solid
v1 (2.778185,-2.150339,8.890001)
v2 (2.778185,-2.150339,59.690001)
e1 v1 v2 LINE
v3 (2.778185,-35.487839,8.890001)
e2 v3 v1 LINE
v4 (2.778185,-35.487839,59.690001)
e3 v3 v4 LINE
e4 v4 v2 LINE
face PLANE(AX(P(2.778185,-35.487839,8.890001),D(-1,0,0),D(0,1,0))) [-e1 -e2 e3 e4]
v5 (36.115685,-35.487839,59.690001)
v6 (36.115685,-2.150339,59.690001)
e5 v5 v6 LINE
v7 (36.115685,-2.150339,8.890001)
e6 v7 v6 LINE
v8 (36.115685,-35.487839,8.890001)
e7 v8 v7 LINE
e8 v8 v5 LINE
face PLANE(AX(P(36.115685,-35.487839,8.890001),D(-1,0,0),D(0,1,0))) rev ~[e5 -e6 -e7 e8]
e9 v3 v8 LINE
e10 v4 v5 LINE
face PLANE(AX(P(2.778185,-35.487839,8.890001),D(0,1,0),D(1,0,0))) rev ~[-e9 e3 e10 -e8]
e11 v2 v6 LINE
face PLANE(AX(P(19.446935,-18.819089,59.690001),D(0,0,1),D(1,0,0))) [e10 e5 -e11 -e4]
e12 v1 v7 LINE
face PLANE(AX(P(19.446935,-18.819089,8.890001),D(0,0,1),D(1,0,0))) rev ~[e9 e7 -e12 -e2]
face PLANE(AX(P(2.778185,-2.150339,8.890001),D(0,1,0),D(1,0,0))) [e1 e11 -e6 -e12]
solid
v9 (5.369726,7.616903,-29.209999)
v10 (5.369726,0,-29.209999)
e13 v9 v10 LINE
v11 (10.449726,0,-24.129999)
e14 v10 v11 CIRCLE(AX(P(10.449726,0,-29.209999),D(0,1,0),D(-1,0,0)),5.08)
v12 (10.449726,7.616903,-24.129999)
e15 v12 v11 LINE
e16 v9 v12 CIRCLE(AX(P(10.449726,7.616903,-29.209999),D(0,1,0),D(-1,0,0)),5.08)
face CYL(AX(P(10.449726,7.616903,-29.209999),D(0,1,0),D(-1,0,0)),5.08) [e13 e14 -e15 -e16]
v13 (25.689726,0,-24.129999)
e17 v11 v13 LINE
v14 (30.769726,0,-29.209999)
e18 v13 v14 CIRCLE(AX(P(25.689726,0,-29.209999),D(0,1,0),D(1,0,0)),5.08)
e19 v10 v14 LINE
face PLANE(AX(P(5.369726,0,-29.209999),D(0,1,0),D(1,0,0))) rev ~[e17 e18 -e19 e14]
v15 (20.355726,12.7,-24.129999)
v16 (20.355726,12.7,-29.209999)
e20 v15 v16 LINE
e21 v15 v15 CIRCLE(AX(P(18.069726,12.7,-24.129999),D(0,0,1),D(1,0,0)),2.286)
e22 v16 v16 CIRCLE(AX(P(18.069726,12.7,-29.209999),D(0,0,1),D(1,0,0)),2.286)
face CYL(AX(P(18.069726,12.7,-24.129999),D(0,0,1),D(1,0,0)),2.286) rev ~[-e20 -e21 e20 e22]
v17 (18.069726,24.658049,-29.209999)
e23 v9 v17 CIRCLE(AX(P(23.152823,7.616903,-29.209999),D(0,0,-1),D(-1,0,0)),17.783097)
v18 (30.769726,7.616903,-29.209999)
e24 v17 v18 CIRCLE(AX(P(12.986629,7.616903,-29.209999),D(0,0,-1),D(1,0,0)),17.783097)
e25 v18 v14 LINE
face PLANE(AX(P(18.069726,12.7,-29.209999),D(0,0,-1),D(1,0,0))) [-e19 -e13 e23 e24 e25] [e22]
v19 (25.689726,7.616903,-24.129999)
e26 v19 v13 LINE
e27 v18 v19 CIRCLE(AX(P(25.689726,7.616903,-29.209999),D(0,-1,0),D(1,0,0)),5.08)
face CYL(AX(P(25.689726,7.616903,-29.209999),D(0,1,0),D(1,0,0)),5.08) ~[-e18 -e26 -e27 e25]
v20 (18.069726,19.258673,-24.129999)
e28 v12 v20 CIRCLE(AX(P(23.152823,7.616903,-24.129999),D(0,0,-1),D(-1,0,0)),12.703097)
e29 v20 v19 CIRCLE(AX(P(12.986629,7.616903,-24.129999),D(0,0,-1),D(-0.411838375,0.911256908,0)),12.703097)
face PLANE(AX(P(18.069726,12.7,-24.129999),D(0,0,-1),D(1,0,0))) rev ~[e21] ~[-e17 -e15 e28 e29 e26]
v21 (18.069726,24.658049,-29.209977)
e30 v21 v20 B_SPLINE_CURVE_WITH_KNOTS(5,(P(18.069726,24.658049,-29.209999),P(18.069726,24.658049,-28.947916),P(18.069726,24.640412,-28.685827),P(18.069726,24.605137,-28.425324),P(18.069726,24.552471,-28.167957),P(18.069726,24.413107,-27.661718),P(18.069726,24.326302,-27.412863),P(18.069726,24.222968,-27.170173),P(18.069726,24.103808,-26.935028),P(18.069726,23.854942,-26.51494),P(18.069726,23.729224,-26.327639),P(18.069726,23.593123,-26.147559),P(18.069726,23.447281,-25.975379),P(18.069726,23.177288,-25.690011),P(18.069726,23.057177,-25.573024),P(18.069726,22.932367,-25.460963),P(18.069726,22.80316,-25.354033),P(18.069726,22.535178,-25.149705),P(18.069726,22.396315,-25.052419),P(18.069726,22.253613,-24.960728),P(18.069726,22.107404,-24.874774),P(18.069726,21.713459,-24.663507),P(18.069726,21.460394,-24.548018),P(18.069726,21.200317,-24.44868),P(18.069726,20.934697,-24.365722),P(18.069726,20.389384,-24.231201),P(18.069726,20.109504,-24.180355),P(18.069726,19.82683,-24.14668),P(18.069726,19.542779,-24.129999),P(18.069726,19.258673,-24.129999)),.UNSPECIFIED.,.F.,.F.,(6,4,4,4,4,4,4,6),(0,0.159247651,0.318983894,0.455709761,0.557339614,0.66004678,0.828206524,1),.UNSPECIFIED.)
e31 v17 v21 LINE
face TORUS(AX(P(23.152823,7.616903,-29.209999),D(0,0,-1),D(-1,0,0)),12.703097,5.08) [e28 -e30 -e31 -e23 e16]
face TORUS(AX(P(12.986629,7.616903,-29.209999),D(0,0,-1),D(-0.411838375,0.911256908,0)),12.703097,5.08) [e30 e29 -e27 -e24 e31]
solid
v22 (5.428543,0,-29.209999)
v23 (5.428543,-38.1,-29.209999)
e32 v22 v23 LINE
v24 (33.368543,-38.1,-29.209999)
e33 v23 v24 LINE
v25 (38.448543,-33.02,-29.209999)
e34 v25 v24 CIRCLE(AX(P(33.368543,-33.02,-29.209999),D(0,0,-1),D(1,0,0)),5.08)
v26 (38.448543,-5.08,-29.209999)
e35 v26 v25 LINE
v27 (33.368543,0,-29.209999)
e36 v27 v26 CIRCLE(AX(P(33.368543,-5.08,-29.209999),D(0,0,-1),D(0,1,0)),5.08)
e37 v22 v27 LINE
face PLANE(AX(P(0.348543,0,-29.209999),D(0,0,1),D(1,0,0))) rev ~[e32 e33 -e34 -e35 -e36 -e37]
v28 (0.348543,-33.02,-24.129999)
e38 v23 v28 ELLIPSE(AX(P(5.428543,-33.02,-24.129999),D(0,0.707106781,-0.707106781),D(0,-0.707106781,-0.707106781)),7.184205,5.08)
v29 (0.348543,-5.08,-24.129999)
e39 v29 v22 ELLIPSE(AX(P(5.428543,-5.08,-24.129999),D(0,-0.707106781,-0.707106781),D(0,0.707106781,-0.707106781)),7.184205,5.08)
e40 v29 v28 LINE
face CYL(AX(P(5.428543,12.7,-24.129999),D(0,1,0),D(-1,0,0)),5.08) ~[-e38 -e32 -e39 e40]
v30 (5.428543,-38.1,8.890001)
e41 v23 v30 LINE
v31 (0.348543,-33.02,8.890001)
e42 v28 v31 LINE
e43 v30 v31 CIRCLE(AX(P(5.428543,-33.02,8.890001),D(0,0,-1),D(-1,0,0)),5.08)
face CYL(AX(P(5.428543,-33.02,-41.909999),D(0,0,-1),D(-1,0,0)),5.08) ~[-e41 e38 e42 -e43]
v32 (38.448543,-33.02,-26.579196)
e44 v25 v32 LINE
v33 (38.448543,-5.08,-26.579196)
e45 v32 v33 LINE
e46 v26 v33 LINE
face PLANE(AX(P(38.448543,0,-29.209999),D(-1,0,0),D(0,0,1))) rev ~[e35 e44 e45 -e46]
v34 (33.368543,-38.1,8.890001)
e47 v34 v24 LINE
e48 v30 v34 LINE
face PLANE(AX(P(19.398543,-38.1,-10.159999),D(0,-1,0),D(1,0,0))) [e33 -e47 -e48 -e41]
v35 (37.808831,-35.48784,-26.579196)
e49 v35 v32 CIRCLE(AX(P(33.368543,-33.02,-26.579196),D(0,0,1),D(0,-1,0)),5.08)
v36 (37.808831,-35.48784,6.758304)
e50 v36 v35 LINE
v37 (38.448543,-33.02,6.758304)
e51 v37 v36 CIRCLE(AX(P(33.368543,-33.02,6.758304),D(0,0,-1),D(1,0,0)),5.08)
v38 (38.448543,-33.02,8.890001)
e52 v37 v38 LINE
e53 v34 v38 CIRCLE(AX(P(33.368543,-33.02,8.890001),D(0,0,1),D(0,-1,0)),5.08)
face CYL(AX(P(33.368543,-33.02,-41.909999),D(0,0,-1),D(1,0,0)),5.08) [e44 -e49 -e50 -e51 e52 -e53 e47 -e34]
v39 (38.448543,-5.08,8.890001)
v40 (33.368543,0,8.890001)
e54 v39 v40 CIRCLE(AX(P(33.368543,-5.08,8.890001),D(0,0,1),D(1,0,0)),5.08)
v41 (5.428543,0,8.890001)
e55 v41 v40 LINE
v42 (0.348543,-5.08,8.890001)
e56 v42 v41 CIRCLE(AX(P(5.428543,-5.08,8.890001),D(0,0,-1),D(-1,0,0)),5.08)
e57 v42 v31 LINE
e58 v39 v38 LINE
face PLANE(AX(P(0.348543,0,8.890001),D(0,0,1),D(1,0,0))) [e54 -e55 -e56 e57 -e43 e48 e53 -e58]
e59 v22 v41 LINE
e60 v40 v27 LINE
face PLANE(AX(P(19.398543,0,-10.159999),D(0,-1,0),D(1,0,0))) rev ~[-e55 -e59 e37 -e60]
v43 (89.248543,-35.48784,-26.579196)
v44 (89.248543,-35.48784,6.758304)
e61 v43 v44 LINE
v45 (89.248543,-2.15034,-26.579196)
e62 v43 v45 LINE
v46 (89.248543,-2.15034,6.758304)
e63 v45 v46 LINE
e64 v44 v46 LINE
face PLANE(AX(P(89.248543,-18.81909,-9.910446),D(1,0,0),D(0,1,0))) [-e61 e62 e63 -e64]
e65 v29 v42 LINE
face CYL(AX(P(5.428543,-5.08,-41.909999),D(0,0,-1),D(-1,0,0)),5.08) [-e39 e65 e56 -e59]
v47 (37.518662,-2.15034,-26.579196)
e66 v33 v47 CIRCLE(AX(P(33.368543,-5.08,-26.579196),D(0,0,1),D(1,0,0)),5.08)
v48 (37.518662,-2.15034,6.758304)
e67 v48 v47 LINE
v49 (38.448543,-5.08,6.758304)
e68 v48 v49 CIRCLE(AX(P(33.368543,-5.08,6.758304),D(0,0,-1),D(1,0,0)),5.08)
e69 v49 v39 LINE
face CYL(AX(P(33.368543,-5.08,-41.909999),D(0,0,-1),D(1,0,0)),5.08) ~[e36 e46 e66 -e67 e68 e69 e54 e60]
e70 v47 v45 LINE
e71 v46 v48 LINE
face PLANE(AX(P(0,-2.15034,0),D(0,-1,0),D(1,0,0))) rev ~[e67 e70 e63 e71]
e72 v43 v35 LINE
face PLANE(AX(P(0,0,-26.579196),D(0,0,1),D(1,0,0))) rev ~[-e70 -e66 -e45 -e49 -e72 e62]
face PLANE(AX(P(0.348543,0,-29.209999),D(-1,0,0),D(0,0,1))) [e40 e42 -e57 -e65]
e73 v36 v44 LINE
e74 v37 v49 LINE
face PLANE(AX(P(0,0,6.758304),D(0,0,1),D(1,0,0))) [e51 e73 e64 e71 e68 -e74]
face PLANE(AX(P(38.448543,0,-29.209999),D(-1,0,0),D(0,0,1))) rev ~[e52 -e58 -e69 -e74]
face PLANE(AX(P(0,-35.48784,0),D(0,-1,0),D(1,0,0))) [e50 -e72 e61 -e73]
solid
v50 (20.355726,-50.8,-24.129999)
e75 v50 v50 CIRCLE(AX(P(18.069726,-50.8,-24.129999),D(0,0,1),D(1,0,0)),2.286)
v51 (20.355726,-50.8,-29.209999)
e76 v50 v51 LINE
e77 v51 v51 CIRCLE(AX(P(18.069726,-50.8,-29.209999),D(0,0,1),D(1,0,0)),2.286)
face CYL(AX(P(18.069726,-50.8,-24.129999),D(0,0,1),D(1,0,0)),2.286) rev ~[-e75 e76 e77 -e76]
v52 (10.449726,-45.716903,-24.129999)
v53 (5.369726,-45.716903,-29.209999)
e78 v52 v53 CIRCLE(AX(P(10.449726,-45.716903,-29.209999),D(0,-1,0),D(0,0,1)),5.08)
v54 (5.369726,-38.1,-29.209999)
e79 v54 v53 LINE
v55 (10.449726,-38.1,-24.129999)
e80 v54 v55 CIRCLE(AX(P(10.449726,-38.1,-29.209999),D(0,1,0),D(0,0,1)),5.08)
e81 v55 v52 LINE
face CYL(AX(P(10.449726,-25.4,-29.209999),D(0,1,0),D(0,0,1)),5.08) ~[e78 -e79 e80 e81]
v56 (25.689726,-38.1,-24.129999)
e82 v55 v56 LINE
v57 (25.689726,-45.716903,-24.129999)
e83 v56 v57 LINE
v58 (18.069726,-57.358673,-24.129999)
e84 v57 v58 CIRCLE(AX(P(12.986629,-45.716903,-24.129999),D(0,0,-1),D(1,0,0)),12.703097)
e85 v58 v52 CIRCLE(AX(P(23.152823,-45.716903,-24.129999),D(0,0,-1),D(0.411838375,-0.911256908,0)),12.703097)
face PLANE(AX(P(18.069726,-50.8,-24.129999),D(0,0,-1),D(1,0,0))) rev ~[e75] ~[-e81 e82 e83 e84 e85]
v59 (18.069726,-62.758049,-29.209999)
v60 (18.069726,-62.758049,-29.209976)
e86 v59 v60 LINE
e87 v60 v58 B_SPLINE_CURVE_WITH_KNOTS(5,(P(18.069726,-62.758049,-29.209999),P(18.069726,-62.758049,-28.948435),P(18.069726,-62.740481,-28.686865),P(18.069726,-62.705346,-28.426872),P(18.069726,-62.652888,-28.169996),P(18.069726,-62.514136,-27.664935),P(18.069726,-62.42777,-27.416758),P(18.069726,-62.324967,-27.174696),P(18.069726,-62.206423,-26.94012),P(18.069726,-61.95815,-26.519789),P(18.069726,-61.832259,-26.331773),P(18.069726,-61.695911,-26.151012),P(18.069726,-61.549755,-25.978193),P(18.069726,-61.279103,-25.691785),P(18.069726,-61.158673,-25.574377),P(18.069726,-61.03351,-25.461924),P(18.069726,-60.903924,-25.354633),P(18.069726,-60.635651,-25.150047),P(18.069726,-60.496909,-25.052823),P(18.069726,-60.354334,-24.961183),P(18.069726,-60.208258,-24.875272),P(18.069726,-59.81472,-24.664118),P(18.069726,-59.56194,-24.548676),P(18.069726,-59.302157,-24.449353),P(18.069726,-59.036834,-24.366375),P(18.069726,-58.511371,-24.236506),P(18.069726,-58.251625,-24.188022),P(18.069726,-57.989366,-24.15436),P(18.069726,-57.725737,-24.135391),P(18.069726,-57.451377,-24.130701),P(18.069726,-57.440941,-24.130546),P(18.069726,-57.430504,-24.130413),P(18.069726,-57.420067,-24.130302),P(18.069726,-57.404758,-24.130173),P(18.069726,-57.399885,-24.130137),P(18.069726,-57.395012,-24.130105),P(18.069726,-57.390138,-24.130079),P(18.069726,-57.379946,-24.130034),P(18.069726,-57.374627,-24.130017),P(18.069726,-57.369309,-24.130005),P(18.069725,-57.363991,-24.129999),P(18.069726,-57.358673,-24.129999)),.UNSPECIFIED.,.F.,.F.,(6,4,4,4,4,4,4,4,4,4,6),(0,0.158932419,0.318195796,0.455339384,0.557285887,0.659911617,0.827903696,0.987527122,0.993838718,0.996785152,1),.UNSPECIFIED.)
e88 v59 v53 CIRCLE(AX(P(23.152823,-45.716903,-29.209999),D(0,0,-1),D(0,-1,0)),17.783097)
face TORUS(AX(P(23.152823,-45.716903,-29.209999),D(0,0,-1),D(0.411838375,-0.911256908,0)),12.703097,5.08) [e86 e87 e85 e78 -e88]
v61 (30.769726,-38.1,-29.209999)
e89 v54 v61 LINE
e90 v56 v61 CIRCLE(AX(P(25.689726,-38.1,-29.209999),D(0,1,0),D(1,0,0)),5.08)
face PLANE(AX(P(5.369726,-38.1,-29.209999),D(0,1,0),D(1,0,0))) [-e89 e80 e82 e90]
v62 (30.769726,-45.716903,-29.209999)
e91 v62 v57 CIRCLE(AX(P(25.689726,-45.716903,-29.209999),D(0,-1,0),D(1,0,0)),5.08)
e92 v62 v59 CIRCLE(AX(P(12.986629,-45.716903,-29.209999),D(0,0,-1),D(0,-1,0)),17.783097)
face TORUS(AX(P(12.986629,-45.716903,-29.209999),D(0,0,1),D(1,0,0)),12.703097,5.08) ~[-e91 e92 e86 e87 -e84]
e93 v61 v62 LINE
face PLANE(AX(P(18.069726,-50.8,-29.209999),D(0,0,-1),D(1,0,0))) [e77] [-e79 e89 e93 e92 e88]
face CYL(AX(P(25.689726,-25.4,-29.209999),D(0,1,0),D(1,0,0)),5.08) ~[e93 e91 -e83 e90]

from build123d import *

# Parameters (mm, degrees)
F0_W           = 38.1
F0_H           = 38.1
F1_DEPTH       = 38.1
F2_W           = 33.3375
F2_H           = 33.3375
F3_DEPTH       = 50.8
F4_W           = 33.3375
F4_H           = 33.3375
F5_DEPTH       = 50.8
F6_W           = 25.4
F6_H           = 25.4
F7_DEPTH       = 5.08
F8_R           = 2.286
F9_DEPTH       = 83.82
F10_T1_DEPTH   = 93.9954855022
F10_2_T1_DEPTH = 93.9954855022
F11_T1_DEPTH   = 63.5
F11_T3_DEPTH   = 63.5
F11_T8_DEPTH   = 63.5
F11_T14_DEPTH  = 63.5
F11_T20_DEPTH  = 63.5
F11_T27_DEPTH  = 63.5
F11_T33_DEPTH  = 63.5
F11_T39_DEPTH  = 63.5
F11_T45_DEPTH  = 63.5
F11_T51_DEPTH  = 63.5
F11_T58_DEPTH  = 63.5
F11_T64_DEPTH  = 63.5
F11_2_T1_DEPTH = 20.3169028996
F11_2_T4_ANGLE = 114.3203710668
F11_2_T6_ANGLE = 114.3203710677
F11_3_T1_DEPTH = 20.3169028996
F11_3_T4_ANGLE = 114.3203710668
F11_3_T6_ANGLE = 114.3203710677


# Not quite as in the source:
# - a fillet or chamfer that OpenCascade refuses, or shapes differently, is made with other operations: its cross-section is extruded or revolved along the edge and cut away or added


with BuildPart() as f1:
    # F0 (on Front) → F1 (new body)
    with BuildSketch(Plane.XZ):
        with Locations((19.3985427063, -10.1599991322)):
            Rectangle(F0_W, F0_H)
    extrude(amount=F1_DEPTH)

    # F2 (on face) → F3 (join)
    with BuildSketch(Plane.YZ.offset(38.4485427063)):
        with Locations((-18.8190903282, -9.9104456074)):
            Rectangle(F2_W, F2_H)
    extrude(amount=F3_DEPTH)

    # F11: fillet of radius 5.08 on 5 edges, made by hand

    # F11_s2 → F11_t1 (cut)
    with BuildSketch(Plane.XY.offset(-41.9099991322)):
        with BuildLine():
            ThreePointArc((0.3485427063, -5.08), (1.8364402579, -1.4878975516), (5.4285427063, 0))
            Line((5.4285427063, 0), (0.3485427063, 0))
            Line((0.3485427063, 0), (0.3485427063, -5.08))
        make_face()
        with BuildLine():
            ThreePointArc((0.3485427063, -33.02), (1.8364402579, -36.6121024484), (5.4285427063, -38.1))
            Line((5.4285427063, -38.1), (0.3485427063, -38.1))
            Line((0.3485427063, -38.1), (0.3485427063, -33.02))
        make_face()
    extrude(amount=F11_T1_DEPTH, mode=Mode.SUBTRACT)

    # F11_s4 → F11_t3 (cut)
    with BuildSketch(Plane.XZ.offset(-12.7)):
        with BuildLine():
            ThreePointArc((0.3485427063, -24.1299991322), (1.8364402579, -27.7221015806), (5.4285427063, -29.2099991322))
            Line((5.4285427063, -29.2099991322), (0.3485427063, -29.2099991322))
            Line((0.3485427063, -29.2099991322), (0.3485427063, -24.1299991322))
        make_face()
    extrude(amount=F11_T3_DEPTH, mode=Mode.SUBTRACT)


with BuildPart() as f5:
    # F4 (on face) → F5 (new body)
    with BuildSketch(Plane.XY.offset(8.8900008678)):
        with Locations((19.4469346859, -18.8190890476)):
            Rectangle(F4_W, F4_H)
    extrude(amount=F5_DEPTH)


with BuildPart() as f7:
    # F6 (on face) → F7 (new body)
    with BuildSketch(Plane(origin=(0, 0, -29.2099991322), x_dir=(1, 0, 0), z_dir=(0, 0, -1))):
        with Locations((18.0697256371, -12.7)):
            Rectangle(F6_W, F6_H)
    extrude(amount=-F7_DEPTH)


with BuildPart() as f7b:
    # F6 (on face) → F7, piece 2 (new body)
    with BuildSketch(Plane(origin=(0, 0, -29.2099991322), x_dir=(1, 0, 0), z_dir=(0, 0, -1))):
        with Locations((18.0697256371, 50.8)):
            Rectangle(F6_W, F6_H)
    extrude(amount=-F7_DEPTH)


with BuildPart() as f9_tool:
    # F8 (on face) → F9 (new body)
    with BuildSketch(Plane.XY.offset(-24.1299991322)):
        with Locations((18.0697256371, -50.8)):
            Circle(F8_R)
        with Locations((18.0697256371, 12.7)):
            Circle(F8_R)
    extrude(amount=-F9_DEPTH)


with BuildPart() as f7_1:
    add(f7.part)

    # F9: cut by f9_tool
    add(f9_tool.part, mode=Mode.SUBTRACT)

    # F10: fillet of radius 17.7830971004 on 2 edges, made by hand

    # F10_s2 → F10_t1 (cut)
    with BuildSketch(Plane.XY.offset(-73.6677418833)):
        with BuildLine():
            ThreePointArc((5.3697256371, 7.6169028996), (10.5782741874, 20.1914514498), (23.1528227376, 25.4))
            Line((23.1528227376, 25.4), (5.3697256371, 25.4))
            Line((5.3697256371, 25.4), (5.3697256371, 7.6169028996))
        make_face()
        with BuildLine():
            ThreePointArc((30.7697256371, 7.6169028996), (25.5611770869, 20.1914514498), (12.9866285367, 25.4))
            Line((12.9866285367, 25.4), (30.7697256371, 25.4))
            Line((30.7697256371, 25.4), (30.7697256371, 7.6169028996))
        make_face()
    extrude(amount=F10_T1_DEPTH, mode=Mode.SUBTRACT)

    # F11#2: fillet of radius 5.08 on 2 edges, made by hand

    # F11_2_s2 → F11_2_t1 (cut)
    with BuildSketch(Plane.XZ.offset(-7.6169028996)):
        with BuildLine():
            ThreePointArc((30.7697256371, -29.2099991322), (29.2818280856, -25.6178966837), (25.6897256371, -24.1299991322))
            Line((25.6897256371, -24.1299991322), (30.7697256371, -24.1299991322))
            Line((30.7697256371, -24.1299991322), (30.7697256371, -29.2099991322))
        make_face()
        with BuildLine():
            ThreePointArc((5.3697256371, -29.2099991322), (6.8576231887, -25.6178966837), (10.4497256371, -24.1299991322))
            Line((10.4497256371, -24.1299991322), (5.3697256371, -24.1299991322))
            Line((5.3697256371, -24.1299991322), (5.3697256371, -29.2099991322))
        make_face()
    extrude(amount=F11_2_T1_DEPTH, mode=Mode.SUBTRACT)

    # F11_2_s3 → F11_2_t4 (revolve, cut)
    with BuildSketch(Plane.XZ.offset(-7.6169028995)):
        with BuildLine():
            ThreePointArc((10.4497256371, -24.1299991322), (6.8576231887, -25.6178966837), (5.3697256371, -29.2099991322))
            Line((5.3697256371, -29.2099991322), (5.3697256371, -24.1299991322))
            Line((5.3697256371, -24.1299991322), (10.4497256371, -24.1299991322))
        make_face()
    revolve(axis=Axis((23.1528227376, 7.6169028995, -24.1299991322), (0, 0, -1)), revolution_arc=F11_2_T4_ANGLE, mode=Mode.SUBTRACT)

    # F11_2_s5 → F11_2_t6 (revolve, cut)
    with BuildSketch(Plane(origin=(13.6425072573, 6.165668504, 0), x_dir=(0, 0, 1), z_dir=(-0.9112569083, -0.4118383749, 0))):
        with BuildLine():
            ThreePointArc((-24.1299991322, 14.2956604954), (-25.6178966837, 17.8877629438), (-29.2099991322, 19.3756604954))
            Line((-29.2099991322, 19.3756604954), (-24.1299991322, 19.3756604954))
            Line((-24.1299991322, 19.3756604954), (-24.1299991322, 14.2956604954))
        make_face()
    revolve(axis=Axis((12.9866285367, 7.6169028996, -24.1299991322), (0, 0, -1)), revolution_arc=F11_2_T6_ANGLE, mode=Mode.SUBTRACT)


with BuildPart() as f7b_1:
    add(f7b.part)

    # F9: cut by f9_tool
    add(f9_tool.part, mode=Mode.SUBTRACT)

    # F10#2: fillet of radius 17.7830971004 on 2 edges, made by hand

    # F10_2_s2 → F10_2_t1 (cut)
    with BuildSketch(Plane.XY.offset(-73.6677418833)):
        with BuildLine():
            ThreePointArc((23.1528227376, -63.5), (10.5782741874, -58.2914514498), (5.3697256371, -45.7169028996))
            Line((5.3697256371, -45.7169028996), (5.3697256371, -63.5))
            Line((5.3697256371, -63.5), (23.1528227376, -63.5))
        make_face()
        with BuildLine():
            ThreePointArc((12.9866285367, -63.5), (25.5611770869, -58.2914514498), (30.7697256371, -45.7169028996))
            Line((30.7697256371, -45.7169028996), (30.7697256371, -63.5))
            Line((30.7697256371, -63.5), (12.9866285367, -63.5))
        make_face()
    extrude(amount=F10_2_T1_DEPTH, mode=Mode.SUBTRACT)

    # F11#3: fillet of radius 5.08 on 2 edges, made by hand

    # F11_3_s2 → F11_3_t1 (cut)
    with BuildSketch(Plane.XZ.offset(25.4)):
        with BuildLine():
            ThreePointArc((30.7697256371, -29.2099991322), (29.2818280856, -25.6178966837), (25.6897256371, -24.1299991322))
            Line((25.6897256371, -24.1299991322), (30.7697256371, -24.1299991322))
            Line((30.7697256371, -24.1299991322), (30.7697256371, -29.2099991322))
        make_face()
        with BuildLine():
            ThreePointArc((10.4497256371, -24.1299991322), (6.8576231887, -25.6178966837), (5.3697256371, -29.2099991322))
            Line((5.3697256371, -29.2099991322), (5.3697256371, -24.1299991322))
            Line((5.3697256371, -24.1299991322), (10.4497256371, -24.1299991322))
        make_face()
    extrude(amount=F11_3_T1_DEPTH, mode=Mode.SUBTRACT)

    # F11_3_s3 → F11_3_t4 (revolve, cut)
    with BuildSketch(Plane(origin=(2.0687305768, 0.9349532839, 0), x_dir=(0, 0, 1), z_dir=(0.9112569083, 0.4118383749, 0))):
        with BuildLine():
            ThreePointArc((-24.1299991322, 63.8981615853), (-25.6178966837, 67.4902640337), (-29.2099991322, 68.9781615853))
            Line((-29.2099991322, 68.9781615853), (-24.1299991322, 68.9781615853))
            Line((-24.1299991322, 68.9781615853), (-24.1299991322, 63.8981615853))
        make_face()
    revolve(axis=Axis((23.1528227376, -45.7169028995, -24.1299991322), (0, 0, -1)), revolution_arc=F11_3_T4_ANGLE, mode=Mode.SUBTRACT)

    # F11_3_s5 → F11_3_t6 (revolve, cut)
    with BuildSketch(Plane.XZ.offset(45.7169028996)):
        with BuildLine():
            ThreePointArc((30.7697256371, -29.2099991322), (29.2818280855, -25.6178966837), (25.6897256371, -24.1299991322))
            Line((25.6897256371, -24.1299991322), (30.7697256371, -24.1299991322))
            Line((30.7697256371, -24.1299991322), (30.7697256371, -29.2099991322))
        make_face()
    revolve(axis=Axis((12.9866285367, -45.7169028996, -24.1299991322), (0, 0, -1)), revolution_arc=F11_3_T6_ANGLE, mode=Mode.SUBTRACT)


with BuildPart() as f11_tool6:
    # F11_s7 → F11_t8 (new body)
    with BuildSketch(Plane.XY.offset(-41.9099991322)):
        with BuildLine():
            ThreePointArc((38.4485427063, -5.08), (36.9606451548, -1.4878975516), (33.3685427063, 0))
            Line((33.3685427063, 0), (38.4485427063, 0))
            Line((38.4485427063, 0), (38.4485427063, -5.08))
        make_face()
    extrude(amount=F11_T8_DEPTH)

    split(bisect_by=Plane.XZ.offset(2.1503403282), keep=Keep.TOP)

    split(bisect_by=Plane.XY.offset(-26.5791956074), keep=Keep.BOTTOM)


with BuildPart() as f1_1:
    add(f1.part)

    # F11_t5: cut F11_tool6
    add(f11_tool6.part, mode=Mode.SUBTRACT)


with BuildPart() as f11_tool12:
    # F11_s13 → F11_t14 (new body)
    with BuildSketch(Plane.XY.offset(-41.9099991322)):
        with BuildLine():
            ThreePointArc((38.4485427063, -5.08), (36.9606451548, -1.4878975516), (33.3685427063, 0))
            Line((33.3685427063, 0), (38.4485427063, 0))
            Line((38.4485427063, 0), (38.4485427063, -5.08))
        make_face()
    extrude(amount=F11_T14_DEPTH)

    split(bisect_by=Plane.XZ.offset(2.1503403282), keep=Keep.BOTTOM)

    split(bisect_by=Plane.XY.offset(-26.5791956074), keep=Keep.BOTTOM)


with BuildPart() as f1_2:
    add(f1_1.part)

    # F11_t11: cut F11_tool12
    add(f11_tool12.part, mode=Mode.SUBTRACT)


with BuildPart() as f11_tool18:
    # F11_s19 → F11_t20 (new body)
    with BuildSketch(Plane.XY.offset(-41.9099991322)):
        with BuildLine():
            ThreePointArc((38.4485427063, -5.08), (36.9606451548, -1.4878975516), (33.3685427063, 0))
            Line((33.3685427063, 0), (38.4485427063, 0))
            Line((38.4485427063, 0), (38.4485427063, -5.08))
        make_face()
    extrude(amount=F11_T20_DEPTH)

    split(bisect_by=Plane.XZ.offset(2.1503403282), keep=Keep.BOTTOM)

    split(bisect_by=Plane.XY.offset(-26.5791956074), keep=Keep.TOP)

    split(bisect_by=Plane.XY.offset(6.7583043926), keep=Keep.BOTTOM)


with BuildPart() as f1_3:
    add(f1_2.part)

    # F11_t17: cut F11_tool18
    add(f11_tool18.part, mode=Mode.SUBTRACT)


with BuildPart() as f11_tool25:
    # F11_s26 → F11_t27 (new body)
    with BuildSketch(Plane.XY.offset(-41.9099991322)):
        with BuildLine():
            ThreePointArc((38.4485427063, -5.08), (36.9606451548, -1.4878975516), (33.3685427063, 0))
            Line((33.3685427063, 0), (38.4485427063, 0))
            Line((38.4485427063, 0), (38.4485427063, -5.08))
        make_face()
    extrude(amount=F11_T27_DEPTH)

    split(bisect_by=Plane.XZ.offset(2.1503403282), keep=Keep.TOP)

    split(bisect_by=Plane.XY.offset(6.7583043926), keep=Keep.TOP)


with BuildPart() as f1_4:
    add(f1_3.part)

    # F11_t24: cut F11_tool25
    add(f11_tool25.part, mode=Mode.SUBTRACT)


with BuildPart() as f11_tool31:
    # F11_s32 → F11_t33 (new body)
    with BuildSketch(Plane.XY.offset(-41.9099991322)):
        with BuildLine():
            ThreePointArc((38.4485427063, -5.08), (36.9606451548, -1.4878975516), (33.3685427063, 0))
            Line((33.3685427063, 0), (38.4485427063, 0))
            Line((38.4485427063, 0), (38.4485427063, -5.08))
        make_face()
    extrude(amount=F11_T33_DEPTH)

    split(bisect_by=Plane.XZ.offset(2.1503403282), keep=Keep.BOTTOM)

    split(bisect_by=Plane.XY.offset(6.7583043926), keep=Keep.TOP)


with BuildPart() as f1_5:
    add(f1_4.part)

    # F11_t30: cut F11_tool31
    add(f11_tool31.part, mode=Mode.SUBTRACT)


with BuildPart() as f11_tool37:
    # F11_s38 → F11_t39 (new body)
    with BuildSketch(Plane.XY.offset(-41.9099991322)):
        with BuildLine():
            ThreePointArc((38.4485427063, -33.02), (36.9606451548, -36.6121024484), (33.3685427063, -38.1))
            Line((33.3685427063, -38.1), (38.4485427063, -38.1))
            Line((38.4485427063, -38.1), (38.4485427063, -33.02))
        make_face()
    extrude(amount=F11_T39_DEPTH)

    split(bisect_by=Plane.XY.offset(-26.5791956074), keep=Keep.BOTTOM)

    split(bisect_by=Plane.XZ.offset(35.4878403282), keep=Keep.BOTTOM)


with BuildPart() as f1_6:
    add(f1_5.part)

    # F11_t36: cut F11_tool37
    add(f11_tool37.part, mode=Mode.SUBTRACT)


with BuildPart() as f11_tool43:
    # F11_s44 → F11_t45 (new body)
    with BuildSketch(Plane.XY.offset(-41.9099991322)):
        with BuildLine():
            ThreePointArc((38.4485427063, -33.02), (36.9606451548, -36.6121024484), (33.3685427063, -38.1))
            Line((33.3685427063, -38.1), (38.4485427063, -38.1))
            Line((38.4485427063, -38.1), (38.4485427063, -33.02))
        make_face()
    extrude(amount=F11_T45_DEPTH)

    split(bisect_by=Plane.XY.offset(-26.5791956074), keep=Keep.BOTTOM)

    split(bisect_by=Plane.XZ.offset(35.4878403282), keep=Keep.TOP)


with BuildPart() as f1_7:
    add(f1_6.part)

    # F11_t42: cut F11_tool43
    add(f11_tool43.part, mode=Mode.SUBTRACT)


with BuildPart() as f11_tool49:
    # F11_s50 → F11_t51 (new body)
    with BuildSketch(Plane.XY.offset(-41.9099991322)):
        with BuildLine():
            ThreePointArc((38.4485427063, -33.02), (36.9606451548, -36.6121024484), (33.3685427063, -38.1))
            Line((33.3685427063, -38.1), (38.4485427063, -38.1))
            Line((38.4485427063, -38.1), (38.4485427063, -33.02))
        make_face()
    extrude(amount=F11_T51_DEPTH)

    split(bisect_by=Plane.XY.offset(-26.5791956074), keep=Keep.TOP)

    split(bisect_by=Plane.XZ.offset(35.4878403282), keep=Keep.TOP)

    split(bisect_by=Plane.XY.offset(6.7583043926), keep=Keep.BOTTOM)


with BuildPart() as f1_8:
    add(f1_7.part)

    # F11_t48: cut F11_tool49
    add(f11_tool49.part, mode=Mode.SUBTRACT)


with BuildPart() as f11_tool56:
    # F11_s57 → F11_t58 (new body)
    with BuildSketch(Plane.XY.offset(-41.9099991322)):
        with BuildLine():
            ThreePointArc((38.4485427063, -33.02), (36.9606451548, -36.6121024484), (33.3685427063, -38.1))
            Line((33.3685427063, -38.1), (38.4485427063, -38.1))
            Line((38.4485427063, -38.1), (38.4485427063, -33.02))
        make_face()
    extrude(amount=F11_T58_DEPTH)

    split(bisect_by=Plane.XZ.offset(35.4878403282), keep=Keep.BOTTOM)

    split(bisect_by=Plane.XY.offset(6.7583043926), keep=Keep.TOP)


with BuildPart() as f1_9:
    add(f1_8.part)

    # F11_t55: cut F11_tool56
    add(f11_tool56.part, mode=Mode.SUBTRACT)


with BuildPart() as f11_tool62:
    # F11_s63 → F11_t64 (new body)
    with BuildSketch(Plane.XY.offset(-41.9099991322)):
        with BuildLine():
            ThreePointArc((38.4485427063, -33.02), (36.9606451548, -36.6121024484), (33.3685427063, -38.1))
            Line((33.3685427063, -38.1), (38.4485427063, -38.1))
            Line((38.4485427063, -38.1), (38.4485427063, -33.02))
        make_face()
    extrude(amount=F11_T64_DEPTH)

    split(bisect_by=Plane.XZ.offset(35.4878403282), keep=Keep.TOP)

    split(bisect_by=Plane.XY.offset(6.7583043926), keep=Keep.TOP)


with BuildPart() as f1_10:
    add(f1_9.part)

    # F11_t61: cut F11_tool62
    add(f11_tool62.part, mode=Mode.SUBTRACT)


solid = Compound([f5.part, f7_1.part, f7b_1.part, f1_10.part])
